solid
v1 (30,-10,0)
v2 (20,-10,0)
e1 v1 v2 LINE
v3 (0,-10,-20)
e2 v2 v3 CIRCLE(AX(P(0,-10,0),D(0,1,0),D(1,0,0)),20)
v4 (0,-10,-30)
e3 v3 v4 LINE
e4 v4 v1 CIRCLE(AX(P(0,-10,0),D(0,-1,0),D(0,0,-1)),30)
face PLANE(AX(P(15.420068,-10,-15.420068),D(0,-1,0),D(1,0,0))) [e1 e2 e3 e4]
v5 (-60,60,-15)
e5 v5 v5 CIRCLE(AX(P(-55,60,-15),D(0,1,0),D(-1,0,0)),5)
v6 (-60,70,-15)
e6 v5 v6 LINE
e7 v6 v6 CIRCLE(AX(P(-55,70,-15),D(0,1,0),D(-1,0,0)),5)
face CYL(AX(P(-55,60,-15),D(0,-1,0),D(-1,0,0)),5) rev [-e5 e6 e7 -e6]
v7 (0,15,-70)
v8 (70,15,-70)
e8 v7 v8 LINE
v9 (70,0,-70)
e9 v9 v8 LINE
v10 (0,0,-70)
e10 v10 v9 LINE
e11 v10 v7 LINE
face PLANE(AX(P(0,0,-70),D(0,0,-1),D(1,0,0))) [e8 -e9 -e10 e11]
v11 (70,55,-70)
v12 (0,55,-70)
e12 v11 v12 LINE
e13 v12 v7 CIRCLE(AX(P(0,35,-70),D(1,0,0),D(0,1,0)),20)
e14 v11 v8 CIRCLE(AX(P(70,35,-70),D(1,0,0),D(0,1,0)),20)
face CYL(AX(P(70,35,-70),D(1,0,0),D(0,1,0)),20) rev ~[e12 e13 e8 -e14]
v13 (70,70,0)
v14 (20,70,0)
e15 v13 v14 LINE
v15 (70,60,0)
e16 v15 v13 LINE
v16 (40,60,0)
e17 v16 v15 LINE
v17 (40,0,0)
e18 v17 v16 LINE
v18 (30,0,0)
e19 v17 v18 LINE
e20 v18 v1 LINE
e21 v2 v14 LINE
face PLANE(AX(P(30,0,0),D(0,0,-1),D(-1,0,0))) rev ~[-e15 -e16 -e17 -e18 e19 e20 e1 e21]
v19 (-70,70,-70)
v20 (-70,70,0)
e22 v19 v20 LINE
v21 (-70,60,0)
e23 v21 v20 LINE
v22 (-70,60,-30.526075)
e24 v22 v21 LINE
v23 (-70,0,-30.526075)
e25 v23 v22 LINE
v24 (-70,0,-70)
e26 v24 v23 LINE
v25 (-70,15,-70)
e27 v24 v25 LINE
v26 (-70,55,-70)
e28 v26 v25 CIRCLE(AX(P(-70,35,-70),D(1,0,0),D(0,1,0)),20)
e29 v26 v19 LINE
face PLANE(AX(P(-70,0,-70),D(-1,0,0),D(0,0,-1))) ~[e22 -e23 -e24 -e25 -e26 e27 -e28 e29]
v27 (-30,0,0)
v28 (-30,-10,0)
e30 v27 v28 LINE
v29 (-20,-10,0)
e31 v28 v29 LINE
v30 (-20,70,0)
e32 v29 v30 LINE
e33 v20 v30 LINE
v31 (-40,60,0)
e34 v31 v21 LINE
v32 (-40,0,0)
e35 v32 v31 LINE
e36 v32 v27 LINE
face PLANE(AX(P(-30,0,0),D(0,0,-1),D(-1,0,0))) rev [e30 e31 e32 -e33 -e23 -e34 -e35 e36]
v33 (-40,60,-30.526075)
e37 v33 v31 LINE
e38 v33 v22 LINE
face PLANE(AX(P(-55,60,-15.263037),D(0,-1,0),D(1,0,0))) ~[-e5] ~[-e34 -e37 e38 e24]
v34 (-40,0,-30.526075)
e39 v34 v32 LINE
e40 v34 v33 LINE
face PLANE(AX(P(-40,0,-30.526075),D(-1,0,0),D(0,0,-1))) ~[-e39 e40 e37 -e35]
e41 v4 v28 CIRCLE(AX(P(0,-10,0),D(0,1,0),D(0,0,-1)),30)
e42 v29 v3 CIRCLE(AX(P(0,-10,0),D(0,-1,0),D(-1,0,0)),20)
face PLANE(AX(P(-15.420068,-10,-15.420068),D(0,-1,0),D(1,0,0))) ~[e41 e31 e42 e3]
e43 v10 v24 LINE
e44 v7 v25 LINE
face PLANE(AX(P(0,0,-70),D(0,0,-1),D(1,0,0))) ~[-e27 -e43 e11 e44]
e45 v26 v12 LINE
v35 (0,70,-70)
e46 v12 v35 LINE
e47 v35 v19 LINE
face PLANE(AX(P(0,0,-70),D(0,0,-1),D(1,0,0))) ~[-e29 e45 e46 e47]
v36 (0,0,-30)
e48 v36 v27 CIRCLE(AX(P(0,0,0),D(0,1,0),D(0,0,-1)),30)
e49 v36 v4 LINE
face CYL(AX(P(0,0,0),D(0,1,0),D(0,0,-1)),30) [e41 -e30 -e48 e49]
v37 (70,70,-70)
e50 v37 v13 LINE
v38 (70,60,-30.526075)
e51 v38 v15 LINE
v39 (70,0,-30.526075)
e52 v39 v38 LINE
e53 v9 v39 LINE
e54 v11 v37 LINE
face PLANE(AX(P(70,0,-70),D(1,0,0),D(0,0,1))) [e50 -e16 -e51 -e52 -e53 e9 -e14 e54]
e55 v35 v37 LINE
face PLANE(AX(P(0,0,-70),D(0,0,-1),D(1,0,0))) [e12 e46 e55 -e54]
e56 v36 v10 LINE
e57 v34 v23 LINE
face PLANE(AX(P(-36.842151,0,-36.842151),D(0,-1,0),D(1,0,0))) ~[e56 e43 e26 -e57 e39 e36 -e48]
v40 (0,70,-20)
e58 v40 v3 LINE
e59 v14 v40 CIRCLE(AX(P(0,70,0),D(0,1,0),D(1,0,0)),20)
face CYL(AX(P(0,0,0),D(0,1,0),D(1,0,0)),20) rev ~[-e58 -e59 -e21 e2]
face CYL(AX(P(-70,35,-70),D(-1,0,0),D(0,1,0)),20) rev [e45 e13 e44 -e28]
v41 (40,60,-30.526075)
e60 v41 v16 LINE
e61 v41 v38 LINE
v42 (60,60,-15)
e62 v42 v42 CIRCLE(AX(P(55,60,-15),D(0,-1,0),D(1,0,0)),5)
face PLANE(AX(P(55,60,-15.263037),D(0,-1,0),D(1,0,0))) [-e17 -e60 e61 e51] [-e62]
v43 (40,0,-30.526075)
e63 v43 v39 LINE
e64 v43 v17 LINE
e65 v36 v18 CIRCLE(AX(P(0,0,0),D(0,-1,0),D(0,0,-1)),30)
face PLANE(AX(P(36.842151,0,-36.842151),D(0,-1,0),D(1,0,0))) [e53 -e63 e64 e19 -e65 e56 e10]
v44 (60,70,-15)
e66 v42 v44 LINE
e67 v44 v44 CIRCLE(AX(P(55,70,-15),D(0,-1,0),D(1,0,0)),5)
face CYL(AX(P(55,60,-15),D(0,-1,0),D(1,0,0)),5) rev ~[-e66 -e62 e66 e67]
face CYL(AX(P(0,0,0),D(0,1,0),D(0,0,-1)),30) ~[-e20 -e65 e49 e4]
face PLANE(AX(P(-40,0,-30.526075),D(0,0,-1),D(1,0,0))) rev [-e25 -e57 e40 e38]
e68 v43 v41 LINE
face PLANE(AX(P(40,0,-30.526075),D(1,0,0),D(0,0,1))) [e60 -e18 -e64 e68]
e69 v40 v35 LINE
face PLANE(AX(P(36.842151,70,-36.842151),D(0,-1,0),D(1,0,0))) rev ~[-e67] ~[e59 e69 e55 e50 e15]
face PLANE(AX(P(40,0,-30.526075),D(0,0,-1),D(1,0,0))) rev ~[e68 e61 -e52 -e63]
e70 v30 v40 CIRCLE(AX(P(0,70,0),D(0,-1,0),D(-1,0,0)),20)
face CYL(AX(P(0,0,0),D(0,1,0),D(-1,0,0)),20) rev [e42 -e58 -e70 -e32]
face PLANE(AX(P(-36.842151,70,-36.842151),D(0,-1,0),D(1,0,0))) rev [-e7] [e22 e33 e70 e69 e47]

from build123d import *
from build123d import SkipClean  # not in build123d's __all__

# Parameters (mm, degrees)
F1_DEPTH = 70
F2_W     = 30
F2_H     = 30.5260747812
F3_DEPTH = 60
F4_R     = 5
F5_DEPTH = 10.001
F6_R     = 20
F7_DEPTH = 70.001
F9_DEPTH = 10


with BuildPart() as f1:
    # F0 (on Front) → F1 (new body)
    with BuildSketch(Plane.XZ):
        with BuildLine():
            Line((0, -20), (0, -70))
            Line((0, -70), (70, -70))
            Line((70, -70), (70, 0))
            Line((70, 0), (20, 0))
            ThreePointArc((20, 0), (14.1421356237, -14.1421356237), (0, -20))
        make_face()
    extrude(amount=-F1_DEPTH)

    # F2 (on face) → F3 (cut)
    with BuildSketch(Plane.XZ):
        with Locations((55, -15.2630373906)):
            Rectangle(F2_W, F2_H)
    extrude(amount=-F3_DEPTH, mode=Mode.SUBTRACT)

    # F4 (on face) → F5 (cut, through all)
    with BuildSketch(Plane.XZ.offset(-60)):
        with Locations((55, -15)):
            Circle(F4_R)
    extrude(amount=-F5_DEPTH, mode=Mode.SUBTRACT)

    # F6 (on face) → F7 (cut, through all)
    with BuildSketch(Plane.YZ.offset(70)):
        with Locations((35, -70)):
            Circle(F6_R)
    extrude(amount=-F7_DEPTH, mode=Mode.SUBTRACT)

    # F8 (on face) → F9 (join)
    with BuildSketch(Plane.XZ):
        with BuildLine():
            ThreePointArc((20, 0), (14.1421356237, -14.1421356237), (0, -20))
            Line((0, -20), (0, -30))
            ThreePointArc((0, -30), (21.2132034356, -21.2132034356), (30, 0))
            Line((30, 0), (20, 0))
        make_face()
    extrude(amount=F9_DEPTH)

    # F10: F1 across plane


with BuildPart() as f1_1:
    add(f1.part, clean=False)
    with SkipClean():  # cleaning this boolean's faces spoils the solid; the shape is the same uncleaned
        add(f1.part.mirror(Plane.YZ), clean=False)


solid = f1_1.part
